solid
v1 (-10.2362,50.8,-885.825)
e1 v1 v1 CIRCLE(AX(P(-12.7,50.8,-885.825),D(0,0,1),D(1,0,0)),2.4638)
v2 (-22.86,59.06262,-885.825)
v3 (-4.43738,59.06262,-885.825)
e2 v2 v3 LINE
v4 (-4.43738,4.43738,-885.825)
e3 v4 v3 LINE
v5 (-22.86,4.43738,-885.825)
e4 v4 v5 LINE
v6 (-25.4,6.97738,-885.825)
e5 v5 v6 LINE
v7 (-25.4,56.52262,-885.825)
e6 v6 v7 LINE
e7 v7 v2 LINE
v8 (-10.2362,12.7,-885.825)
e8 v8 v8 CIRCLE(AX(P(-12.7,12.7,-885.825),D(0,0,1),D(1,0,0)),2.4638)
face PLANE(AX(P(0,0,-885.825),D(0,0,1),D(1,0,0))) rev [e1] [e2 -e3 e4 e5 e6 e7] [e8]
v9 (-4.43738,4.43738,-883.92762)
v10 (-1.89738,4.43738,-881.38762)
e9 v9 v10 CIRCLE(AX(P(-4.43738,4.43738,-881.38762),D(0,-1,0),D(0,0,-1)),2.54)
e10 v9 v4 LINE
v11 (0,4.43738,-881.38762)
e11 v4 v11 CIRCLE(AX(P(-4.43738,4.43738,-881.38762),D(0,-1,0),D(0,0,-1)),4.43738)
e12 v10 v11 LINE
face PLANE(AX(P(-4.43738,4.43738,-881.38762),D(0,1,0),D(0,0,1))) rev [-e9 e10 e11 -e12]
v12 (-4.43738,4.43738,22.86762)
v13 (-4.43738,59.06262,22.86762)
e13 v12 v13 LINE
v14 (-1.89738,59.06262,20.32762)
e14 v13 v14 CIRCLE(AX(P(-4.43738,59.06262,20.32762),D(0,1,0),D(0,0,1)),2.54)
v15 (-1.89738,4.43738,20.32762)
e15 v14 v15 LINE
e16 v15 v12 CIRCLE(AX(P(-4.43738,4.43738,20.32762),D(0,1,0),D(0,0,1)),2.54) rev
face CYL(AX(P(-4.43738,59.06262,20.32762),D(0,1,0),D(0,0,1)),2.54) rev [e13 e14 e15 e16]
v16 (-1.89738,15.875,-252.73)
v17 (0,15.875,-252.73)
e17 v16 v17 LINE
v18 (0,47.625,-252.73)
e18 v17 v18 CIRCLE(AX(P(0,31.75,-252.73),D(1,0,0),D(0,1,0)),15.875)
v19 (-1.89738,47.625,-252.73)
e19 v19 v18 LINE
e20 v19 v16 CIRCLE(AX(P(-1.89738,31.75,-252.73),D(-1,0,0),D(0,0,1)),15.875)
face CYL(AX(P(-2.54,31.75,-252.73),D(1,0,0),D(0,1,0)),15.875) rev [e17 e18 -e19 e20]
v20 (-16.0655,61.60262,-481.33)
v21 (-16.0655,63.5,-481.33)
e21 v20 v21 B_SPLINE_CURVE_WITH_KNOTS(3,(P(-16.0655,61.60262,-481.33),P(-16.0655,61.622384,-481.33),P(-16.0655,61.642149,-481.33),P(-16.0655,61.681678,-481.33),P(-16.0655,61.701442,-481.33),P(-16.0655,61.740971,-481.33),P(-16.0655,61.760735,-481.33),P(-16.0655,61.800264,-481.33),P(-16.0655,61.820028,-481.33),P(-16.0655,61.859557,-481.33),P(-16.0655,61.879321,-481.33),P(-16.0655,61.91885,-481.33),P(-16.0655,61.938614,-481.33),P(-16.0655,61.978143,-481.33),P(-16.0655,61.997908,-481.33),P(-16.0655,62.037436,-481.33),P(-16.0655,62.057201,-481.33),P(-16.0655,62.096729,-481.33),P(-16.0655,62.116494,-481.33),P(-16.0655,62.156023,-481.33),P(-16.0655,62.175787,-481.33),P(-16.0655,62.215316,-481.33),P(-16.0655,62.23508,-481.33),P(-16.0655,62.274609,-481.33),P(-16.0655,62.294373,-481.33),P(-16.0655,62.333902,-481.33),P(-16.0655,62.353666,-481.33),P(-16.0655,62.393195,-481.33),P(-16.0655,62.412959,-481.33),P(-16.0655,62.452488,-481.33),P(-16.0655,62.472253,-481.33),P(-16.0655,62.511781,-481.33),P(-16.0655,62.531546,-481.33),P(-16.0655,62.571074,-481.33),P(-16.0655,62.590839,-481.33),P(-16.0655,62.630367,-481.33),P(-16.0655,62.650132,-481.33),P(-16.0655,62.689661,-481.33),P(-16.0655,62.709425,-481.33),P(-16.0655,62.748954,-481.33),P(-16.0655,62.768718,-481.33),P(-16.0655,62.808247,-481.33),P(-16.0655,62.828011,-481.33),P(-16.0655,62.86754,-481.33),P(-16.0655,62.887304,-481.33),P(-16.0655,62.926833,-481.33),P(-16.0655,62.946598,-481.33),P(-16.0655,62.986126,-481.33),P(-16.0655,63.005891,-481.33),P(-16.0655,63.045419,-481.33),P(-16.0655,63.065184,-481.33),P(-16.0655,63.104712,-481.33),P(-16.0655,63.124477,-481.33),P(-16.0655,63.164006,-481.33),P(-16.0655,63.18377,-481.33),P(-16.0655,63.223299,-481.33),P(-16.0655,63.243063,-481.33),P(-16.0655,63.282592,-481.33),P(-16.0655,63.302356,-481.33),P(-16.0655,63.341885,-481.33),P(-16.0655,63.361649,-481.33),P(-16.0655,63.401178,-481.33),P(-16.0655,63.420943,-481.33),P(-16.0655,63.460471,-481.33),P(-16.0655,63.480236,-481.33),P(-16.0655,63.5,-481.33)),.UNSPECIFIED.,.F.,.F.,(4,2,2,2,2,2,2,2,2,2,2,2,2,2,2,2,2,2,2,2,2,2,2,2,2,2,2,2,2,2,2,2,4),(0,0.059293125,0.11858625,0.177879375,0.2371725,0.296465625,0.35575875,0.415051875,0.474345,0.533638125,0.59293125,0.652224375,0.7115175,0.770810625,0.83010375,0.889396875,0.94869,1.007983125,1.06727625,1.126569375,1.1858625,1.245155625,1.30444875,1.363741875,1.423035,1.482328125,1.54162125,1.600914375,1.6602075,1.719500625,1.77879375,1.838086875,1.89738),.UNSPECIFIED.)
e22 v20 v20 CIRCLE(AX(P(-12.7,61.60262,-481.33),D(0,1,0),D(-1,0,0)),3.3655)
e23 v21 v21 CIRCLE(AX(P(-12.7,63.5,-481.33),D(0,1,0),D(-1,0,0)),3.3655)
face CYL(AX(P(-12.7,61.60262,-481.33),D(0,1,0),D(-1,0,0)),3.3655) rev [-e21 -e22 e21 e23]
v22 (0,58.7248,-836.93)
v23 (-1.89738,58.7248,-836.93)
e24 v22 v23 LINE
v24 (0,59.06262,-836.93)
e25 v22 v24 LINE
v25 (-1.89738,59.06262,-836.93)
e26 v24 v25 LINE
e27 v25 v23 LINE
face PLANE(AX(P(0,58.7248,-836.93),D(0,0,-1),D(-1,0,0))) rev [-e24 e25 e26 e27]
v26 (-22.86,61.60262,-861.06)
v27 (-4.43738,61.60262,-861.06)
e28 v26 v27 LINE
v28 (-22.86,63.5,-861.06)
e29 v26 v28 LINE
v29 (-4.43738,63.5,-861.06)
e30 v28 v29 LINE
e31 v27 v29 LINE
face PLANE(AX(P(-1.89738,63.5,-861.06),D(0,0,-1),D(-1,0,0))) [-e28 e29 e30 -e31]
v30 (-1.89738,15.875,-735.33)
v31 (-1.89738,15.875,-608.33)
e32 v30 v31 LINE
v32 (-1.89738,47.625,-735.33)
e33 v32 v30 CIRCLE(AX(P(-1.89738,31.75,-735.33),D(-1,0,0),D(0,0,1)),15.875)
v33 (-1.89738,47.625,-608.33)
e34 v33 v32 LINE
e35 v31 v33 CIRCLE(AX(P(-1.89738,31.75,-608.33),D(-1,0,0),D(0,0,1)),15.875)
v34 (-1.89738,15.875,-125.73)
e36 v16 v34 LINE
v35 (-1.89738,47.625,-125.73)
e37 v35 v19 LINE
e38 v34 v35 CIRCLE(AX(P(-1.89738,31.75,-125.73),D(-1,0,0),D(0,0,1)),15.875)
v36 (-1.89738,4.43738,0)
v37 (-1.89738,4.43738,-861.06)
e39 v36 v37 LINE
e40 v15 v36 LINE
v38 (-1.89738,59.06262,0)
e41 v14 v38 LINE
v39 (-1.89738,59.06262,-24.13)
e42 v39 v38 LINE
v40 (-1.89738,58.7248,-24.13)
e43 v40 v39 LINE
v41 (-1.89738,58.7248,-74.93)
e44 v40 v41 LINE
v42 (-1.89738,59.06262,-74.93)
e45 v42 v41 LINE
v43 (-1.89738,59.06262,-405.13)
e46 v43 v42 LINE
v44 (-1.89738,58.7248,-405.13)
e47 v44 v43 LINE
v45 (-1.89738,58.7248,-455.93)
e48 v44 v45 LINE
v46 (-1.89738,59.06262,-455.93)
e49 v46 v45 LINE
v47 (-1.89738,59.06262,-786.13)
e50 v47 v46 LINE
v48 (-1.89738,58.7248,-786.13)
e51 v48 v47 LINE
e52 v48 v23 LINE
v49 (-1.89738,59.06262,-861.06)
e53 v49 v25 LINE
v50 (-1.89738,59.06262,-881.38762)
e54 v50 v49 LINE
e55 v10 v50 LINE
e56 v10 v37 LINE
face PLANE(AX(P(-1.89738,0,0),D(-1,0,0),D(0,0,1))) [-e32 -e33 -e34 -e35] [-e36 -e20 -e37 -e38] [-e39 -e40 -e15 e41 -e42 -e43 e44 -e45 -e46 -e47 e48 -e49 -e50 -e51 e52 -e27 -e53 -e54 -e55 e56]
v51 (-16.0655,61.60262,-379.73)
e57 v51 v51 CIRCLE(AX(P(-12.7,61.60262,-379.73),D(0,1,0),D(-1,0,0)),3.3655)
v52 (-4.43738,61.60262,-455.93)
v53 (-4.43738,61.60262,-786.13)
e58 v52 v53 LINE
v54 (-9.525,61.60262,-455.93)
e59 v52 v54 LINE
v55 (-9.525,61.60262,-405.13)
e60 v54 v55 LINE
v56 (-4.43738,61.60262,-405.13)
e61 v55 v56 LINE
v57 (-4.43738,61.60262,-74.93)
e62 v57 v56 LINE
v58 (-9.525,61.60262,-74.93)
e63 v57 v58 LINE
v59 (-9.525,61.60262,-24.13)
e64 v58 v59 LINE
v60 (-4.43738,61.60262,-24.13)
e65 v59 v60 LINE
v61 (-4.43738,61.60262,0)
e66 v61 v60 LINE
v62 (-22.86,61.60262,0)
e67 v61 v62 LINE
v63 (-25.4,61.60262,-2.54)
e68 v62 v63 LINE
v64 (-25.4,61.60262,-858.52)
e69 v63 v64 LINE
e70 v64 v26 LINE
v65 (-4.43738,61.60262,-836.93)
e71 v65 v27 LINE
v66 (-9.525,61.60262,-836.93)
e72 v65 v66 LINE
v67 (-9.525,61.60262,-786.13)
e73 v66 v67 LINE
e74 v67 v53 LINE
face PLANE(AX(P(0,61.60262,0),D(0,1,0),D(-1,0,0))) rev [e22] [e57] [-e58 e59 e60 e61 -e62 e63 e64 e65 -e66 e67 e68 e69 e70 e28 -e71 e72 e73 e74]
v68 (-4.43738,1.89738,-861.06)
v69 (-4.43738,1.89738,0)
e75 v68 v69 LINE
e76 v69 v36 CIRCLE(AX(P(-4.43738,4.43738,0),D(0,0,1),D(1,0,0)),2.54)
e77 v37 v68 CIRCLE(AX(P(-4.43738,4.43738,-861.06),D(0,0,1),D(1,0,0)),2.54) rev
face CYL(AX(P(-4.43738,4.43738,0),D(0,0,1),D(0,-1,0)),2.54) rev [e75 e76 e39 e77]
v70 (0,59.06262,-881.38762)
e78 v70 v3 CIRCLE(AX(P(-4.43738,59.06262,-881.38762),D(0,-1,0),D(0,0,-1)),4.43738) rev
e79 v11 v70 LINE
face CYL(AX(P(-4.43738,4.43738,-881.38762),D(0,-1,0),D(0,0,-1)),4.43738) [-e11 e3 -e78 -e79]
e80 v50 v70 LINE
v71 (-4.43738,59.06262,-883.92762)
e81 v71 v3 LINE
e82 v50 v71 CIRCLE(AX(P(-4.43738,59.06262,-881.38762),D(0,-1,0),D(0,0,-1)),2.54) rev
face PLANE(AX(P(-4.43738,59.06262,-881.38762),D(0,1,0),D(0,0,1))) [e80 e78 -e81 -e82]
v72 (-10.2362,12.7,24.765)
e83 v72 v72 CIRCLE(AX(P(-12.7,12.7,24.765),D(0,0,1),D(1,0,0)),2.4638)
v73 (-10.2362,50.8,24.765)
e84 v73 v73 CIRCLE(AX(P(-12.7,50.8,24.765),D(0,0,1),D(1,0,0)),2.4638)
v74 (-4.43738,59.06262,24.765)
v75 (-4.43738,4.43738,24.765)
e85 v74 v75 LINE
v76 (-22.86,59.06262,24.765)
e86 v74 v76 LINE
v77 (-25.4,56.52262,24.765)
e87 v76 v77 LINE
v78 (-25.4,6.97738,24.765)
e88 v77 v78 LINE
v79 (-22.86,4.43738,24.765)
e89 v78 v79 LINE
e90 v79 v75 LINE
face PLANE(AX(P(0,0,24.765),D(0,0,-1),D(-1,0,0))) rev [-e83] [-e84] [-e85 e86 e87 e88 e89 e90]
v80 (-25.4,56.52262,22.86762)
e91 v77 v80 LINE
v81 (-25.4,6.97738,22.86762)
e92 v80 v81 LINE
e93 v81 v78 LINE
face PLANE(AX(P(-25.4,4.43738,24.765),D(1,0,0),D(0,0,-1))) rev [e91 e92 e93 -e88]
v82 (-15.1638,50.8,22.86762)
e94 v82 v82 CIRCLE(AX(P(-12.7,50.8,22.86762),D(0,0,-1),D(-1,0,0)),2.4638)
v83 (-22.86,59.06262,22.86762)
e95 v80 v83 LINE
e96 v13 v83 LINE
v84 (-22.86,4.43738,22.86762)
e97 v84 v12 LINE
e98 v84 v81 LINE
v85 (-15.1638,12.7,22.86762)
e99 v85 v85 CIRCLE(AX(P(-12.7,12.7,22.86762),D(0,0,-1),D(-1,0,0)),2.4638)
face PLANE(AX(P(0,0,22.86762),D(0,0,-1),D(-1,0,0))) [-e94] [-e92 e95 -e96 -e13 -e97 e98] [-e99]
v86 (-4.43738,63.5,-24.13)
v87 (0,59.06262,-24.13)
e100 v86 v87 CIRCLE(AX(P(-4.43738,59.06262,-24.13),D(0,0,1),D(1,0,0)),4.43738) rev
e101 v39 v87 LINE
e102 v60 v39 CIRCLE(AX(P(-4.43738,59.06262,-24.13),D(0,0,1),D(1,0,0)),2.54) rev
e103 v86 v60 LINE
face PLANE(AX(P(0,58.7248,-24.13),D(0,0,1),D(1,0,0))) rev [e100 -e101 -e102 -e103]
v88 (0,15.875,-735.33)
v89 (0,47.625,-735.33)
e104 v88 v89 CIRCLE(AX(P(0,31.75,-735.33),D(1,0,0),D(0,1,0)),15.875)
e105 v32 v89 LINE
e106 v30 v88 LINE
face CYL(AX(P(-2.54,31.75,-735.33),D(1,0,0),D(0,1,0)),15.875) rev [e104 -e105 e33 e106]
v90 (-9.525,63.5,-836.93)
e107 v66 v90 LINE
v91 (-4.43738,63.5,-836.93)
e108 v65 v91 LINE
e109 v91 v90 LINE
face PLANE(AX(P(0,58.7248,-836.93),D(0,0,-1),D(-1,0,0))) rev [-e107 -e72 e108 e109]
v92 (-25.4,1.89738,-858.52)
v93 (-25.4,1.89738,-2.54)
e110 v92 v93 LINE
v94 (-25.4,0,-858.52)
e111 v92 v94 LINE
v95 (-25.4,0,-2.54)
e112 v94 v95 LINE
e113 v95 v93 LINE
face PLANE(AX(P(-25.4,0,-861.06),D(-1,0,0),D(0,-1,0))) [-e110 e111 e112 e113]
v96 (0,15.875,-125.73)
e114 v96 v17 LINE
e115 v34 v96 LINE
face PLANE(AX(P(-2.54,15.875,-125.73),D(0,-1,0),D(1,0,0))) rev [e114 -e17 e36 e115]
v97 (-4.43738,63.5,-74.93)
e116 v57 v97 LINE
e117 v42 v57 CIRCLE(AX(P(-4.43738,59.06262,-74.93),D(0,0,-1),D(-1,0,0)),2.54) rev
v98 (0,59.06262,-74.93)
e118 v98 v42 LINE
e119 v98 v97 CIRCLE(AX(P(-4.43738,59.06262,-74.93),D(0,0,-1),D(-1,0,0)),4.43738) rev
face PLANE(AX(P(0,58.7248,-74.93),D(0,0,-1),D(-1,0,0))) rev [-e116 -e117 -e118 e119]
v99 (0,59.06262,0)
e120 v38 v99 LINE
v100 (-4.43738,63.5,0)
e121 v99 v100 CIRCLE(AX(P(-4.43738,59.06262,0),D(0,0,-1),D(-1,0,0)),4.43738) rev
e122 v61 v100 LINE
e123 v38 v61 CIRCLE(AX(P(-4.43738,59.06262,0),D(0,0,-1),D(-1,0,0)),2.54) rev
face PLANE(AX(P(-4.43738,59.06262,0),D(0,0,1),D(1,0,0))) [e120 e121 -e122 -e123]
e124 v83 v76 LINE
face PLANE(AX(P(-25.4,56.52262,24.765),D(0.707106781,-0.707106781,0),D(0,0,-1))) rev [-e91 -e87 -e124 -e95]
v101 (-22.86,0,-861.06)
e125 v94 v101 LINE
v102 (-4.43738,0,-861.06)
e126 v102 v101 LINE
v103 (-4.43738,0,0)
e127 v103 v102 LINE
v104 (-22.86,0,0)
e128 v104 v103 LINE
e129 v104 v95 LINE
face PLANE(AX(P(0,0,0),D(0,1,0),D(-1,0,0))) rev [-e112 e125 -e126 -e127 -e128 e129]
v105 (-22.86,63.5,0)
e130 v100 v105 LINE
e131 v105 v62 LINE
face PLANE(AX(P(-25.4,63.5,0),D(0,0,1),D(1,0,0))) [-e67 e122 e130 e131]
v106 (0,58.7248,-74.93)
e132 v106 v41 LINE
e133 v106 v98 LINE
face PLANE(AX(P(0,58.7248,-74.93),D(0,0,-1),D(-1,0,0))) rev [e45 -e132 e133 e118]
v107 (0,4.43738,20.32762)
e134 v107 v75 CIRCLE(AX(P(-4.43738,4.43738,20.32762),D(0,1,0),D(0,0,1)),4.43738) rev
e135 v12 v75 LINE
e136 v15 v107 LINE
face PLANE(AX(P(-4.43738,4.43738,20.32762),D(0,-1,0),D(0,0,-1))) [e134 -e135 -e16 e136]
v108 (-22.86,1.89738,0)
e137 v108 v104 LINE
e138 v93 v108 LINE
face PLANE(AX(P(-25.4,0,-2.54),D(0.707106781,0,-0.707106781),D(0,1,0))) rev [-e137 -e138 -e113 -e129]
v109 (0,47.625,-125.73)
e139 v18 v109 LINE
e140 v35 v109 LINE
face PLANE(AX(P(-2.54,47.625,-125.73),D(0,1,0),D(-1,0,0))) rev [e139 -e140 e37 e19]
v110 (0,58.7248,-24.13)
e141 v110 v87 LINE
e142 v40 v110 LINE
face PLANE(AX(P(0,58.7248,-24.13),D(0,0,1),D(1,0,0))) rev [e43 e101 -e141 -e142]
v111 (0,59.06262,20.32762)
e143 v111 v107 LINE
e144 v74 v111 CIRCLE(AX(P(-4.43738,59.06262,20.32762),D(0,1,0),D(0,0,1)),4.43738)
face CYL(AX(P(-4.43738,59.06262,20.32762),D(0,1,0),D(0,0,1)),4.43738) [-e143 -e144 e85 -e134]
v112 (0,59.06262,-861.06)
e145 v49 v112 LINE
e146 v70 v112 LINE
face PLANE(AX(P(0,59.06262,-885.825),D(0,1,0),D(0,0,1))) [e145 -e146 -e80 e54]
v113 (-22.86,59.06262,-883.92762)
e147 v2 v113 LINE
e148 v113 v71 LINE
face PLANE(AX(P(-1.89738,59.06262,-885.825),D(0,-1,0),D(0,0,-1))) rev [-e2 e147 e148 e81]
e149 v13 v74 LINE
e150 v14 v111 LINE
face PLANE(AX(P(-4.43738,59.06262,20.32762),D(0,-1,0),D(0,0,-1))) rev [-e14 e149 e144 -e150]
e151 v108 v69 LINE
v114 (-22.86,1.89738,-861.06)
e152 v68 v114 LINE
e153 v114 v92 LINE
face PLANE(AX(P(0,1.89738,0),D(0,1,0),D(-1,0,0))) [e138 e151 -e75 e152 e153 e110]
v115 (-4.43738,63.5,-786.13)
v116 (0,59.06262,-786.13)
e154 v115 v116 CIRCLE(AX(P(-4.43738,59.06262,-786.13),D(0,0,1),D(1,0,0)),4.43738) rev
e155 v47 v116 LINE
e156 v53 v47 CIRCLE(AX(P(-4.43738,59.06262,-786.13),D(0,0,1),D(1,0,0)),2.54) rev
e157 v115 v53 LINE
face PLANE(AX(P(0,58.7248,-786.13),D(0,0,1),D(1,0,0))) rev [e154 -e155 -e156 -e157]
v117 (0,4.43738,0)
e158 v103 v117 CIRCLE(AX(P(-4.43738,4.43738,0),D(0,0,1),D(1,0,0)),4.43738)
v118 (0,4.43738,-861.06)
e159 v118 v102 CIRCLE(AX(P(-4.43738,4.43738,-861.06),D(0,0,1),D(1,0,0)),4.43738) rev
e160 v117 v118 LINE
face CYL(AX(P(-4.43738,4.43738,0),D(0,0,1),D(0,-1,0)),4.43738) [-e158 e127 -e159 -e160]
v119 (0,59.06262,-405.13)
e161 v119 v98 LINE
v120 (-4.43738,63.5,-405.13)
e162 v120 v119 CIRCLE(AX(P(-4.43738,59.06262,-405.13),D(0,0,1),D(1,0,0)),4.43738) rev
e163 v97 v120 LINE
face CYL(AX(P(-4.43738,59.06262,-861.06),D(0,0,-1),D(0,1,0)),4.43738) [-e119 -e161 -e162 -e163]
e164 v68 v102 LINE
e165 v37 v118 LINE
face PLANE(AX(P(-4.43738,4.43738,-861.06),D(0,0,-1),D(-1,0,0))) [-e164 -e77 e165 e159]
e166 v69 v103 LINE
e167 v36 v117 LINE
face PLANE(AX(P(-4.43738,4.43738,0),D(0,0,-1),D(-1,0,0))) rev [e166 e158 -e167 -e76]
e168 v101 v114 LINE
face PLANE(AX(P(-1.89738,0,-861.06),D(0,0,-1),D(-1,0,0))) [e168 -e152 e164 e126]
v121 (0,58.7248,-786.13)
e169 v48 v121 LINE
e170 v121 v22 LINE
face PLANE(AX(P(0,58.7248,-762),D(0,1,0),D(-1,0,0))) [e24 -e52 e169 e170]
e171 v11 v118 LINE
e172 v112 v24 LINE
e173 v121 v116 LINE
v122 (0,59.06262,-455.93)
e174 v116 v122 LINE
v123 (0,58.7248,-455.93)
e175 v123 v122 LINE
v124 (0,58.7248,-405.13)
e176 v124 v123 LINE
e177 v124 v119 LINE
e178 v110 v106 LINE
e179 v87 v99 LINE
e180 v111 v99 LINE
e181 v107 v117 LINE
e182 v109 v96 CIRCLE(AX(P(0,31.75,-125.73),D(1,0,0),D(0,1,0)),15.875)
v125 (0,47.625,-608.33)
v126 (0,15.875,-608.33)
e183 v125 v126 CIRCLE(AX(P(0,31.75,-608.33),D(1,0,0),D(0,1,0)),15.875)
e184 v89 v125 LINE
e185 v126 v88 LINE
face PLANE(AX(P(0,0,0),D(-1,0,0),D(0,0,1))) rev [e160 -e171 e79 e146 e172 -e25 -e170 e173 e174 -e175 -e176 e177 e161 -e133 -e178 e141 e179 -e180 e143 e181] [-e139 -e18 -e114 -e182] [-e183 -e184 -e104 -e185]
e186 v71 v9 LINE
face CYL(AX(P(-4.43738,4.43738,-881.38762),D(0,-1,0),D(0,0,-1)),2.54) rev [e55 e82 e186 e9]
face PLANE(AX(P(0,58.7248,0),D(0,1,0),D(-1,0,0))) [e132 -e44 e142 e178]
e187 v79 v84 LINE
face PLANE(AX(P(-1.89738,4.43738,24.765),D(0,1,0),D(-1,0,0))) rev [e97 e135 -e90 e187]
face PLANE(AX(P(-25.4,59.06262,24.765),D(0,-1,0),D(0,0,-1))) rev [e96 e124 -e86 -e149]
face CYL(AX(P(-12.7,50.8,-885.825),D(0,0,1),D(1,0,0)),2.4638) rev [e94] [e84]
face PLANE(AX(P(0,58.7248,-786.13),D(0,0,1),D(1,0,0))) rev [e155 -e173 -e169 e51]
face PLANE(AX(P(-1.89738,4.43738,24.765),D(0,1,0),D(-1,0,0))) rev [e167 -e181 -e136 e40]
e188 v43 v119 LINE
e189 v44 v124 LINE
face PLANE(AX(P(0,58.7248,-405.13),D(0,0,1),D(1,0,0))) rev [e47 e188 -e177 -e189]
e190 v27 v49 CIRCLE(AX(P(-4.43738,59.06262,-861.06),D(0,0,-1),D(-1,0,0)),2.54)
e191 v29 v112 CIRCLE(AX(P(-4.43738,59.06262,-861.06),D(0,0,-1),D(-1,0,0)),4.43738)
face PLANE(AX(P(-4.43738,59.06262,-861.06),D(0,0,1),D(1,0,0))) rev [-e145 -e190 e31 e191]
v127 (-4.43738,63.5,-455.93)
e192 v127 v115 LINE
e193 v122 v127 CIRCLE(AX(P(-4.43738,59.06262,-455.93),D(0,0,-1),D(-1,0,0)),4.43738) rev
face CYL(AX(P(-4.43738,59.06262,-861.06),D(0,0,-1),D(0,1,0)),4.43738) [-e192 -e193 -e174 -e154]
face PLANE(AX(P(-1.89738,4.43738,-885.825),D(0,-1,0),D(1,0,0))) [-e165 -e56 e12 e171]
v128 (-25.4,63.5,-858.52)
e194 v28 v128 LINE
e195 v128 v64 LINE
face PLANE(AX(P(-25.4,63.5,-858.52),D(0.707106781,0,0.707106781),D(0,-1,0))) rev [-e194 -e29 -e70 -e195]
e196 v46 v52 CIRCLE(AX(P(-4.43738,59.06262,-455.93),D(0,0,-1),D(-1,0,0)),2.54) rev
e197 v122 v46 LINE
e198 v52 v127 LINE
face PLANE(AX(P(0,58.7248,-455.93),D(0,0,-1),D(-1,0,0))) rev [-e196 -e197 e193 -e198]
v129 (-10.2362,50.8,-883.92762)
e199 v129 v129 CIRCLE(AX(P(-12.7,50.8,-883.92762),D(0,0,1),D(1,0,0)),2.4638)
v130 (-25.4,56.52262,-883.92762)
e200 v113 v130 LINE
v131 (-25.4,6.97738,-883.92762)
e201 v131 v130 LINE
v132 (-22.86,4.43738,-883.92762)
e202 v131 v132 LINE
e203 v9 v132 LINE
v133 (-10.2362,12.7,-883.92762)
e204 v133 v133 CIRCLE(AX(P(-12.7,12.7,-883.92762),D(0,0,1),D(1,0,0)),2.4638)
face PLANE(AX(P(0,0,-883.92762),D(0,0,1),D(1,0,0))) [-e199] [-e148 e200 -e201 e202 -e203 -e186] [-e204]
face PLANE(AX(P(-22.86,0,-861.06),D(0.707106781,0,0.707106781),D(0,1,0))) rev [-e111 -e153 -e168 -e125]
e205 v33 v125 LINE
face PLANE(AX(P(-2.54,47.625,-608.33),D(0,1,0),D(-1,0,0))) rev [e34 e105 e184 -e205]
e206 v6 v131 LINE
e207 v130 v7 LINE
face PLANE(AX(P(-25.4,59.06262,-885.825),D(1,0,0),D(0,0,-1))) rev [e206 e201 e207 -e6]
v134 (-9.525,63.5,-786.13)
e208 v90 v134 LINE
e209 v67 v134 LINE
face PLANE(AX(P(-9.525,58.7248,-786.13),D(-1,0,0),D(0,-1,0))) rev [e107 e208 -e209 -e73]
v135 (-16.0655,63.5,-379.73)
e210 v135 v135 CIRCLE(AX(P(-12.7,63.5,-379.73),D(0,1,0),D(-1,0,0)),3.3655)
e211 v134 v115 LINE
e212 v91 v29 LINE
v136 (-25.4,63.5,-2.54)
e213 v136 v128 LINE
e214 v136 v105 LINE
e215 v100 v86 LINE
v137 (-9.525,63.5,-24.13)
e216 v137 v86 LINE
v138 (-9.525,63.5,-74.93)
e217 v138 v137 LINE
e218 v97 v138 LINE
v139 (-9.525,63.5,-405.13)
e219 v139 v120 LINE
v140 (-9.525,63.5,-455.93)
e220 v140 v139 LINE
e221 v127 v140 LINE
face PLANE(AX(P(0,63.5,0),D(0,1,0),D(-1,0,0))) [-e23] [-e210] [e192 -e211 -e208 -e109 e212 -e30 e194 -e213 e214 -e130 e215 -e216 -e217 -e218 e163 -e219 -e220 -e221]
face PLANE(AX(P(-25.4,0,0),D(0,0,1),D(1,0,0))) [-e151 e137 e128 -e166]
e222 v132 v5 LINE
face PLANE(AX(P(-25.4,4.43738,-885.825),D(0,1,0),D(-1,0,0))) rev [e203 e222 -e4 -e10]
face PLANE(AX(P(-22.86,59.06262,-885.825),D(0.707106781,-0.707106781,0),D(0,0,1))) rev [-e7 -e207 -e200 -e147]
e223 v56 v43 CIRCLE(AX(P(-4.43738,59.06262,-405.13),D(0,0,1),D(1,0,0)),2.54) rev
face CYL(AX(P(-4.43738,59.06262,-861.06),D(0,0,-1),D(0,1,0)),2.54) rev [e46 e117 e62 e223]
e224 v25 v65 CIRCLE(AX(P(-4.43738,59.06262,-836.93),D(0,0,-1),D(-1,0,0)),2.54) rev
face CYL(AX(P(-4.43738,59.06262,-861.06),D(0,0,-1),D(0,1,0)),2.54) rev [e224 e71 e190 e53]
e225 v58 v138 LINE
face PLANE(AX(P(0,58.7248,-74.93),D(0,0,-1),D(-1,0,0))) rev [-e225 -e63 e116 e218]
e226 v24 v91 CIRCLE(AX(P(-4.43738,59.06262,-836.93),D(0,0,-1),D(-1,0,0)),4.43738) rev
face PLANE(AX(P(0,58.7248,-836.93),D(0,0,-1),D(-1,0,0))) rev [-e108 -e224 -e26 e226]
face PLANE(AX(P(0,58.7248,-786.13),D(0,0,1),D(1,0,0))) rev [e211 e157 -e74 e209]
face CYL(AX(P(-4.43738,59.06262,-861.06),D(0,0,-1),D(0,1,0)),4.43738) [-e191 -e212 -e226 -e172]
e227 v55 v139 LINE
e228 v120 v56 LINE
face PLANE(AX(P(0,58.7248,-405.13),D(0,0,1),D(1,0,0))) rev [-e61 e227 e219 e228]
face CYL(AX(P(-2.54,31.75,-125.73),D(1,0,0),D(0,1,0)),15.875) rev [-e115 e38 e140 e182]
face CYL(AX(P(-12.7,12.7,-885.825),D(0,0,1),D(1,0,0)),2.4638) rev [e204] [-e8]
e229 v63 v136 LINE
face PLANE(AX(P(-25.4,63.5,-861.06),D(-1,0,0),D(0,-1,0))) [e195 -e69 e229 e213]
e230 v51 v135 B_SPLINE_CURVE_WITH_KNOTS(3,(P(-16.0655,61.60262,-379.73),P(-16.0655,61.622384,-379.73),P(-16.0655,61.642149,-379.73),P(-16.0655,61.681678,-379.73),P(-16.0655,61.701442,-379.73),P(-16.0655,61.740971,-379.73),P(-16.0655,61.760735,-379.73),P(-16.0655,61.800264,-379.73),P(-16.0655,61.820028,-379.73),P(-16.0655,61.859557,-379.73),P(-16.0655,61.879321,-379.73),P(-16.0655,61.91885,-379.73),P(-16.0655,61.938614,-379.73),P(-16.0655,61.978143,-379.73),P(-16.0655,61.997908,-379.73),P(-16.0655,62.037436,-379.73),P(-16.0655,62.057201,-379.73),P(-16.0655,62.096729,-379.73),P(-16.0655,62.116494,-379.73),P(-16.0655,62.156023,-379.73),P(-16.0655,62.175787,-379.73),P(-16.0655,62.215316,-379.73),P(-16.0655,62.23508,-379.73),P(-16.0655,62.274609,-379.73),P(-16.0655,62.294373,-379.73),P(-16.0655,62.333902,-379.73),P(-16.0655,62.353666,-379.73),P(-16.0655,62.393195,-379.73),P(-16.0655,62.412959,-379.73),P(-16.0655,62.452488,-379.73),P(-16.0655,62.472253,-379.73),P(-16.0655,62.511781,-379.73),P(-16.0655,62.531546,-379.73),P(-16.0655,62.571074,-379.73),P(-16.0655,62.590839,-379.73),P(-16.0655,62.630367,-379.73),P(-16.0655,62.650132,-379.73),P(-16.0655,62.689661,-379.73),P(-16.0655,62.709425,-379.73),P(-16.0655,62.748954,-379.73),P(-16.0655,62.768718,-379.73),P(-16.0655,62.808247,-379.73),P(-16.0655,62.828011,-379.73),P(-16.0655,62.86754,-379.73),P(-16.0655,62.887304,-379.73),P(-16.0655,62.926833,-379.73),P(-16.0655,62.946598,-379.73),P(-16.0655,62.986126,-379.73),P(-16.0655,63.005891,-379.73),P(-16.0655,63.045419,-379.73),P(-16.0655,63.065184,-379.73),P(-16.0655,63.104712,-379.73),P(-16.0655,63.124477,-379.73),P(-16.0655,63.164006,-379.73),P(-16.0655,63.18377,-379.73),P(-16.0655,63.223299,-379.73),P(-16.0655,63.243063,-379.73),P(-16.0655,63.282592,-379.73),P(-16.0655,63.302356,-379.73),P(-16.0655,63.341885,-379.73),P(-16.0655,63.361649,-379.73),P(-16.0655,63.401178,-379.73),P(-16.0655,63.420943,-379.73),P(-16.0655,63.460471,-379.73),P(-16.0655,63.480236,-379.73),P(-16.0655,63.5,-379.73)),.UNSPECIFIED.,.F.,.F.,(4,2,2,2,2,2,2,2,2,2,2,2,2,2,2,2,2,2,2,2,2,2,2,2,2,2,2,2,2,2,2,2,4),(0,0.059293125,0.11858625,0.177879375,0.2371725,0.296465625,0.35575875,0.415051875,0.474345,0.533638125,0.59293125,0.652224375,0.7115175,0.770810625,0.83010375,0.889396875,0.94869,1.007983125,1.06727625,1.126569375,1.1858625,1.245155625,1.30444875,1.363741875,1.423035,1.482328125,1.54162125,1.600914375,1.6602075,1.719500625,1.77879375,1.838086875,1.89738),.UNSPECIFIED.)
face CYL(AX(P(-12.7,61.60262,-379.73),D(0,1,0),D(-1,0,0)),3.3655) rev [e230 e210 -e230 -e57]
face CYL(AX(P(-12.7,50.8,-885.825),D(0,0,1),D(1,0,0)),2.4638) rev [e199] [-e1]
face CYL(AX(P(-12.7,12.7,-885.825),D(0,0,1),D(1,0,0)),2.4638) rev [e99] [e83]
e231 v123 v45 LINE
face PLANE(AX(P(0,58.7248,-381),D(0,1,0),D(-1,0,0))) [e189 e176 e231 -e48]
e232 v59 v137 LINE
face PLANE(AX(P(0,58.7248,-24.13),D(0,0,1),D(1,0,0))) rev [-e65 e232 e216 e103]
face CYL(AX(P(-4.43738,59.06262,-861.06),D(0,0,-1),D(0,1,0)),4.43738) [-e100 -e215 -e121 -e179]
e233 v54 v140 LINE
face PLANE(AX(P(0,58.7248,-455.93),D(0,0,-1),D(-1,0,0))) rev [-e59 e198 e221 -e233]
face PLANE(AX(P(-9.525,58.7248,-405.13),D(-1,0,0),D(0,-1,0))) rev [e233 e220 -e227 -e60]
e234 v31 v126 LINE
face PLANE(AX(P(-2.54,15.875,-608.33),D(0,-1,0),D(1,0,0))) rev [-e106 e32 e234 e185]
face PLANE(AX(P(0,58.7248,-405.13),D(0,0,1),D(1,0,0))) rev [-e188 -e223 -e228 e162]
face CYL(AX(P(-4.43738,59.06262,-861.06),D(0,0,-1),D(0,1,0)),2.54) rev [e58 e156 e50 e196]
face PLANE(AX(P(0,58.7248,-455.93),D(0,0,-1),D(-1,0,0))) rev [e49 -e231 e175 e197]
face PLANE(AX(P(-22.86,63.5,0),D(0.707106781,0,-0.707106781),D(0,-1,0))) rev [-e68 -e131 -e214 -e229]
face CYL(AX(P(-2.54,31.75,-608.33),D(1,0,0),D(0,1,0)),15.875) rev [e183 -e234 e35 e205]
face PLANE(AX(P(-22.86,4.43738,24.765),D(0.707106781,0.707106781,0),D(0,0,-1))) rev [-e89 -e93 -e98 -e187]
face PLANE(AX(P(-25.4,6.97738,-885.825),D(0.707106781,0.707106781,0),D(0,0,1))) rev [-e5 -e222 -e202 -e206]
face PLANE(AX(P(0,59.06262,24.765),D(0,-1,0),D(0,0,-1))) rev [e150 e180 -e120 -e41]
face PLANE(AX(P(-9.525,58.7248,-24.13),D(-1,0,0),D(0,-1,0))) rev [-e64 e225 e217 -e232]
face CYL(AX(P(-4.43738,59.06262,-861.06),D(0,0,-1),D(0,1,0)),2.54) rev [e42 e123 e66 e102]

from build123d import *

# Parameters (mm, degrees)
SKETCH1_W                      = 861.06
SKETCH1_H                      = 63.5
BASE_FLANGE1_DEPTH             = 1.89738
EDGE_FLANGE1_STRIP_W           = 12.66952
EDGE_FLANGE1_STRIP_H           = 1.89738
EDGE_FLANGE1_STRIP_CUT_DEPTH   = 861.06
EDGE_FLANGE1_STRIP_2_W         = 12.66952
EDGE_FLANGE1_STRIP_2_H         = 1.89738
EDGE_FLANGE1_STRIP_CUT_2_DEPTH = 861.06
EDGE_FLANGE1_DEPTH             = 861.06
EDGE_FLANGE1_BEND_DEPTH        = 861.06
SKETCH12_W                     = 1.89738
SKETCH12_H                     = 54.62524
BOSS_EXTRUDE1_DEPTH            = 24.765
EDGE_FLANGE2_STRIP_W           = 12.66952
EDGE_FLANGE2_STRIP_H           = 1.89738
EDGE_FLANGE2_STRIP_CUT_DEPTH   = 54.62524
EDGE_FLANGE2_STRIP_2_W         = 12.66952
EDGE_FLANGE2_STRIP_2_H         = 1.89738
EDGE_FLANGE2_STRIP_CUT_2_DEPTH = 54.62524
EDGE_FLANGE2_DEPTH             = 54.62524
EDGE_FLANGE2_BEND_DEPTH        = 54.62524
SKETCH16_W                     = 9.525
SKETCH16_H                     = 50.8
CUT_EXTRUDE1_DEPTH             = 4.7752
LPATTERN1_COUNT                = 3
LPATTERN1_PITCH                = 381
SKETCH17_R                     = 3.3655
CUT_EXTRUDE2_DEPTH             = 2.54
CUT_EXTRUDE3_DEPTH             = 2.54
LPATTERN2_COUNT                = 2
LPATTERN2_PITCH                = 482.6
SKETCH25_R                     = 2.4638
CUT_EXTRUDE4_DEPTH             = 914.154728455
CHAMFER1_SIZE                  = 2.54


# Sheet-metal steps are written as plain solids
with BuildPart() as part:
    # Sketch1 → Base-Flange1 (new body)
    with BuildSketch(Plane(origin=(0, 0, 0), x_dir=(0, 0, -1), z_dir=(1, 0, 0))):
        with Locations((430.53, 31.75)):
            Rectangle(SKETCH1_W, SKETCH1_H)
    extrude(amount=-BASE_FLANGE1_DEPTH)

    # Edge-Flange1 strip (across the edge) → Edge-Flange1 strip cut (cut)
    with BuildSketch(Plane(origin=(-1.89738, 63.5, 0), x_dir=(0, -1, 0), z_dir=(0, 0, -1))):
        with Locations((-1.89738, -0.94869)):
            Rectangle(EDGE_FLANGE1_STRIP_W, EDGE_FLANGE1_STRIP_H)
    extrude(amount=EDGE_FLANGE1_STRIP_CUT_DEPTH, mode=Mode.SUBTRACT)

    # Edge-Flange1 strip 2 (across the edge) → Edge-Flange1 strip cut 2 (cut)
    with BuildSketch(Plane(origin=(-1.89738, 0, -861.06), x_dir=(0, 1, 0), z_dir=(0, 0, 1))):
        with Locations((-1.89738, -0.94869)):
            Rectangle(EDGE_FLANGE1_STRIP_2_W, EDGE_FLANGE1_STRIP_2_H)
    extrude(amount=EDGE_FLANGE1_STRIP_CUT_2_DEPTH, mode=Mode.SUBTRACT)

    # Edge-Flange1 section (across the edge) → Edge-Flange1 (add)
    with BuildSketch(Plane(origin=(-1.89738, 63.5, 0), x_dir=(0, -1, 0), z_dir=(0, 0, -1))):
        with BuildLine():
            Line((0, 2.54), (0, 23.50262))
            Line((0, 23.50262), (1.89738, 23.50262))
            Line((1.89738, 23.50262), (1.89738, 2.54))
            ThreePointArc((1.89738, 2.54), (2.641328776, 0.743948776), (4.43738, 0))
            Line((4.43738, 0), (4.43738, -1.89738))
            ThreePointArc((4.43738, -1.89738), (1.299678511, -0.597701489), (0, 2.54))
        make_face()
    extrude(amount=EDGE_FLANGE1_DEPTH)

    # Edge-Flange1 section 2 (across the edge) → Edge-Flange1 bend (add)
    with BuildSketch(Plane(origin=(-1.89738, 0, -861.06), x_dir=(0, 1, 0), z_dir=(0, 0, 1))):
        with BuildLine():
            Line((0, 2.54), (0, 23.50262))
            Line((0, 23.50262), (1.89738, 23.50262))
            Line((1.89738, 23.50262), (1.89738, 2.54))
            ThreePointArc((1.89738, 2.54), (2.641328776, 0.743948776), (4.43738, 0))
            Line((4.43738, 0), (4.43738, -1.89738))
            ThreePointArc((4.43738, -1.89738), (1.299678511, -0.597701489), (0, 2.54))
        make_face()
    extrude(amount=EDGE_FLANGE1_BEND_DEPTH)

    # Sketch12 → Boss-Extrude1 (add)
    with BuildSketch(Plane.XY):
        with Locations((-0.94869, 31.75)):
            Rectangle(SKETCH12_W, SKETCH12_H)
    boss_extrude1 = extrude(amount=BOSS_EXTRUDE1_DEPTH)

    # Mirror1: Boss-Extrude1 across plane
    add(boss_extrude1.mirror(Plane.XY.offset(-430.53)))

    # Edge-Flange2 strip (across the edge) → Edge-Flange2 strip cut (cut)
    with BuildSketch(Plane(origin=(-1.89738, 4.43738, 24.765), x_dir=(0, 0, -1), z_dir=(0, 1, 0))):
        with Locations((-1.89738, -0.94869)):
            Rectangle(EDGE_FLANGE2_STRIP_W, EDGE_FLANGE2_STRIP_H)
    extrude(amount=EDGE_FLANGE2_STRIP_CUT_DEPTH, mode=Mode.SUBTRACT)

    # Edge-Flange2 strip 2 (across the edge) → Edge-Flange2 strip cut 2 (cut)
    with BuildSketch(Plane(origin=(-1.89738, 59.06262, -885.825), x_dir=(0, 0, 1), z_dir=(0, -1, 0))):
        with Locations((-1.89738, -0.94869)):
            Rectangle(EDGE_FLANGE2_STRIP_2_W, EDGE_FLANGE2_STRIP_2_H)
    extrude(amount=EDGE_FLANGE2_STRIP_CUT_2_DEPTH, mode=Mode.SUBTRACT)

    # Edge-Flange2 section (across the edge) → Edge-Flange2 (add)
    with BuildSketch(Plane(origin=(-1.89738, 4.43738, 24.765), x_dir=(0, 0, -1), z_dir=(0, 1, 0))):
        with BuildLine():
            Line((0, 2.54), (0, 23.50262))
            Line((0, 23.50262), (1.89738, 23.50262))
            Line((1.89738, 23.50262), (1.89738, 2.54))
            ThreePointArc((1.89738, 2.54), (2.641328776, 0.743948776), (4.43738, 0))
            Line((4.43738, 0), (4.43738, -1.89738))
            ThreePointArc((4.43738, -1.89738), (1.299678511, -0.597701489), (0, 2.54))
        make_face()
    extrude(amount=EDGE_FLANGE2_DEPTH)

    # Edge-Flange2 section 2 (across the edge) → Edge-Flange2 bend (add)
    with BuildSketch(Plane(origin=(-1.89738, 59.06262, -885.825), x_dir=(0, 0, 1), z_dir=(0, -1, 0))):
        with BuildLine():
            Line((0, 2.54), (0, 23.50262))
            Line((0, 23.50262), (1.89738, 23.50262))
            Line((1.89738, 23.50262), (1.89738, 2.54))
            ThreePointArc((1.89738, 2.54), (2.641328776, 0.743948776), (4.43738, 0))
            Line((4.43738, 0), (4.43738, -1.89738))
            ThreePointArc((4.43738, -1.89738), (1.299678511, -0.597701489), (0, 2.54))
        make_face()
    extrude(amount=EDGE_FLANGE2_BEND_DEPTH)

    # Sketch16 → Cut-Extrude1 (cut)
    with BuildSketch(Plane(origin=(0, 63.5, 0), x_dir=(1, 0, 0), z_dir=(0, 1, 0))):
        with Locations((-4.7625, 49.53)):
            Rectangle(SKETCH16_W, SKETCH16_H)
    cut_extrude1 = extrude(amount=-CUT_EXTRUDE1_DEPTH, mode=Mode.SUBTRACT)

    # LPattern1: Cut-Extrude1 ×3
    with Locations(*[(0, 0, -i * LPATTERN1_PITCH) for i in range(1, LPATTERN1_COUNT)]):
        add(cut_extrude1, mode=Mode.SUBTRACT)

    # Sketch17 → Cut-Extrude2 (cut)
    with BuildSketch(Plane(origin=(0, 63.5, 0), x_dir=(1, 0, 0), z_dir=(0, 1, 0))):
        with Locations(Location((-12.7, 481.33, 0), (0, 0, 180))):
            Circle(SKETCH17_R)
        with Locations(Location((-12.7, 379.73, 0), (0, 0, 180))):
            Circle(SKETCH17_R)
    extrude(amount=-CUT_EXTRUDE2_DEPTH, mode=Mode.SUBTRACT)

    # Sketch18 → Cut-Extrude3 (cut)
    with BuildSketch(Plane(origin=(0, 0, 0), x_dir=(0, 0, -1), z_dir=(1, 0, 0))):
        with BuildLine():
            Line((125.73, 47.625), (252.73, 47.625))
            ThreePointArc((252.73, 47.625), (268.605, 31.75), (252.73, 15.875))
            Line((252.73, 15.875), (125.73, 15.875))
            ThreePointArc((125.73, 15.875), (109.855, 31.75), (125.73, 47.625))
        make_face()
    cut_extrude3 = extrude(amount=-CUT_EXTRUDE3_DEPTH, mode=Mode.SUBTRACT)

    # LPattern2: Cut-Extrude3 ×2
    with Locations(*[(0, 0, -i * LPATTERN2_PITCH) for i in range(1, LPATTERN2_COUNT)]):
        add(cut_extrude3, mode=Mode.SUBTRACT)

    # Sketch25 → Cut-Extrude4 (cut, through all)
    with BuildSketch(Plane.XY.offset(24.765)):
        with Locations((-12.7, 50.8)):
            Circle(SKETCH25_R)
        with Locations((-12.7, 12.7)):
            Circle(SKETCH25_R)
    extrude(amount=-CUT_EXTRUDE4_DEPTH, mode=Mode.SUBTRACT)

    # Chamfer1
    chamfer1_edges = [part.edges().sort_by_distance(p)[0] for p in [
        (-25.4, 4.43738, 23.81631),
        (-25.4, 59.06262, 23.81631),
        (-25.4, 59.06262, -884.87631),
        (-25.4, 4.43738, -884.87631),
        (-25.4, 62.55131, 0),
        (-25.4, 62.55131, -861.06),
        (-25.4, 0.94869, -861.06),
        (-25.4, 0.94869, 0),
    ]]
    chamfer(chamfer1_edges, length=CHAMFER1_SIZE)


solid = part.part
